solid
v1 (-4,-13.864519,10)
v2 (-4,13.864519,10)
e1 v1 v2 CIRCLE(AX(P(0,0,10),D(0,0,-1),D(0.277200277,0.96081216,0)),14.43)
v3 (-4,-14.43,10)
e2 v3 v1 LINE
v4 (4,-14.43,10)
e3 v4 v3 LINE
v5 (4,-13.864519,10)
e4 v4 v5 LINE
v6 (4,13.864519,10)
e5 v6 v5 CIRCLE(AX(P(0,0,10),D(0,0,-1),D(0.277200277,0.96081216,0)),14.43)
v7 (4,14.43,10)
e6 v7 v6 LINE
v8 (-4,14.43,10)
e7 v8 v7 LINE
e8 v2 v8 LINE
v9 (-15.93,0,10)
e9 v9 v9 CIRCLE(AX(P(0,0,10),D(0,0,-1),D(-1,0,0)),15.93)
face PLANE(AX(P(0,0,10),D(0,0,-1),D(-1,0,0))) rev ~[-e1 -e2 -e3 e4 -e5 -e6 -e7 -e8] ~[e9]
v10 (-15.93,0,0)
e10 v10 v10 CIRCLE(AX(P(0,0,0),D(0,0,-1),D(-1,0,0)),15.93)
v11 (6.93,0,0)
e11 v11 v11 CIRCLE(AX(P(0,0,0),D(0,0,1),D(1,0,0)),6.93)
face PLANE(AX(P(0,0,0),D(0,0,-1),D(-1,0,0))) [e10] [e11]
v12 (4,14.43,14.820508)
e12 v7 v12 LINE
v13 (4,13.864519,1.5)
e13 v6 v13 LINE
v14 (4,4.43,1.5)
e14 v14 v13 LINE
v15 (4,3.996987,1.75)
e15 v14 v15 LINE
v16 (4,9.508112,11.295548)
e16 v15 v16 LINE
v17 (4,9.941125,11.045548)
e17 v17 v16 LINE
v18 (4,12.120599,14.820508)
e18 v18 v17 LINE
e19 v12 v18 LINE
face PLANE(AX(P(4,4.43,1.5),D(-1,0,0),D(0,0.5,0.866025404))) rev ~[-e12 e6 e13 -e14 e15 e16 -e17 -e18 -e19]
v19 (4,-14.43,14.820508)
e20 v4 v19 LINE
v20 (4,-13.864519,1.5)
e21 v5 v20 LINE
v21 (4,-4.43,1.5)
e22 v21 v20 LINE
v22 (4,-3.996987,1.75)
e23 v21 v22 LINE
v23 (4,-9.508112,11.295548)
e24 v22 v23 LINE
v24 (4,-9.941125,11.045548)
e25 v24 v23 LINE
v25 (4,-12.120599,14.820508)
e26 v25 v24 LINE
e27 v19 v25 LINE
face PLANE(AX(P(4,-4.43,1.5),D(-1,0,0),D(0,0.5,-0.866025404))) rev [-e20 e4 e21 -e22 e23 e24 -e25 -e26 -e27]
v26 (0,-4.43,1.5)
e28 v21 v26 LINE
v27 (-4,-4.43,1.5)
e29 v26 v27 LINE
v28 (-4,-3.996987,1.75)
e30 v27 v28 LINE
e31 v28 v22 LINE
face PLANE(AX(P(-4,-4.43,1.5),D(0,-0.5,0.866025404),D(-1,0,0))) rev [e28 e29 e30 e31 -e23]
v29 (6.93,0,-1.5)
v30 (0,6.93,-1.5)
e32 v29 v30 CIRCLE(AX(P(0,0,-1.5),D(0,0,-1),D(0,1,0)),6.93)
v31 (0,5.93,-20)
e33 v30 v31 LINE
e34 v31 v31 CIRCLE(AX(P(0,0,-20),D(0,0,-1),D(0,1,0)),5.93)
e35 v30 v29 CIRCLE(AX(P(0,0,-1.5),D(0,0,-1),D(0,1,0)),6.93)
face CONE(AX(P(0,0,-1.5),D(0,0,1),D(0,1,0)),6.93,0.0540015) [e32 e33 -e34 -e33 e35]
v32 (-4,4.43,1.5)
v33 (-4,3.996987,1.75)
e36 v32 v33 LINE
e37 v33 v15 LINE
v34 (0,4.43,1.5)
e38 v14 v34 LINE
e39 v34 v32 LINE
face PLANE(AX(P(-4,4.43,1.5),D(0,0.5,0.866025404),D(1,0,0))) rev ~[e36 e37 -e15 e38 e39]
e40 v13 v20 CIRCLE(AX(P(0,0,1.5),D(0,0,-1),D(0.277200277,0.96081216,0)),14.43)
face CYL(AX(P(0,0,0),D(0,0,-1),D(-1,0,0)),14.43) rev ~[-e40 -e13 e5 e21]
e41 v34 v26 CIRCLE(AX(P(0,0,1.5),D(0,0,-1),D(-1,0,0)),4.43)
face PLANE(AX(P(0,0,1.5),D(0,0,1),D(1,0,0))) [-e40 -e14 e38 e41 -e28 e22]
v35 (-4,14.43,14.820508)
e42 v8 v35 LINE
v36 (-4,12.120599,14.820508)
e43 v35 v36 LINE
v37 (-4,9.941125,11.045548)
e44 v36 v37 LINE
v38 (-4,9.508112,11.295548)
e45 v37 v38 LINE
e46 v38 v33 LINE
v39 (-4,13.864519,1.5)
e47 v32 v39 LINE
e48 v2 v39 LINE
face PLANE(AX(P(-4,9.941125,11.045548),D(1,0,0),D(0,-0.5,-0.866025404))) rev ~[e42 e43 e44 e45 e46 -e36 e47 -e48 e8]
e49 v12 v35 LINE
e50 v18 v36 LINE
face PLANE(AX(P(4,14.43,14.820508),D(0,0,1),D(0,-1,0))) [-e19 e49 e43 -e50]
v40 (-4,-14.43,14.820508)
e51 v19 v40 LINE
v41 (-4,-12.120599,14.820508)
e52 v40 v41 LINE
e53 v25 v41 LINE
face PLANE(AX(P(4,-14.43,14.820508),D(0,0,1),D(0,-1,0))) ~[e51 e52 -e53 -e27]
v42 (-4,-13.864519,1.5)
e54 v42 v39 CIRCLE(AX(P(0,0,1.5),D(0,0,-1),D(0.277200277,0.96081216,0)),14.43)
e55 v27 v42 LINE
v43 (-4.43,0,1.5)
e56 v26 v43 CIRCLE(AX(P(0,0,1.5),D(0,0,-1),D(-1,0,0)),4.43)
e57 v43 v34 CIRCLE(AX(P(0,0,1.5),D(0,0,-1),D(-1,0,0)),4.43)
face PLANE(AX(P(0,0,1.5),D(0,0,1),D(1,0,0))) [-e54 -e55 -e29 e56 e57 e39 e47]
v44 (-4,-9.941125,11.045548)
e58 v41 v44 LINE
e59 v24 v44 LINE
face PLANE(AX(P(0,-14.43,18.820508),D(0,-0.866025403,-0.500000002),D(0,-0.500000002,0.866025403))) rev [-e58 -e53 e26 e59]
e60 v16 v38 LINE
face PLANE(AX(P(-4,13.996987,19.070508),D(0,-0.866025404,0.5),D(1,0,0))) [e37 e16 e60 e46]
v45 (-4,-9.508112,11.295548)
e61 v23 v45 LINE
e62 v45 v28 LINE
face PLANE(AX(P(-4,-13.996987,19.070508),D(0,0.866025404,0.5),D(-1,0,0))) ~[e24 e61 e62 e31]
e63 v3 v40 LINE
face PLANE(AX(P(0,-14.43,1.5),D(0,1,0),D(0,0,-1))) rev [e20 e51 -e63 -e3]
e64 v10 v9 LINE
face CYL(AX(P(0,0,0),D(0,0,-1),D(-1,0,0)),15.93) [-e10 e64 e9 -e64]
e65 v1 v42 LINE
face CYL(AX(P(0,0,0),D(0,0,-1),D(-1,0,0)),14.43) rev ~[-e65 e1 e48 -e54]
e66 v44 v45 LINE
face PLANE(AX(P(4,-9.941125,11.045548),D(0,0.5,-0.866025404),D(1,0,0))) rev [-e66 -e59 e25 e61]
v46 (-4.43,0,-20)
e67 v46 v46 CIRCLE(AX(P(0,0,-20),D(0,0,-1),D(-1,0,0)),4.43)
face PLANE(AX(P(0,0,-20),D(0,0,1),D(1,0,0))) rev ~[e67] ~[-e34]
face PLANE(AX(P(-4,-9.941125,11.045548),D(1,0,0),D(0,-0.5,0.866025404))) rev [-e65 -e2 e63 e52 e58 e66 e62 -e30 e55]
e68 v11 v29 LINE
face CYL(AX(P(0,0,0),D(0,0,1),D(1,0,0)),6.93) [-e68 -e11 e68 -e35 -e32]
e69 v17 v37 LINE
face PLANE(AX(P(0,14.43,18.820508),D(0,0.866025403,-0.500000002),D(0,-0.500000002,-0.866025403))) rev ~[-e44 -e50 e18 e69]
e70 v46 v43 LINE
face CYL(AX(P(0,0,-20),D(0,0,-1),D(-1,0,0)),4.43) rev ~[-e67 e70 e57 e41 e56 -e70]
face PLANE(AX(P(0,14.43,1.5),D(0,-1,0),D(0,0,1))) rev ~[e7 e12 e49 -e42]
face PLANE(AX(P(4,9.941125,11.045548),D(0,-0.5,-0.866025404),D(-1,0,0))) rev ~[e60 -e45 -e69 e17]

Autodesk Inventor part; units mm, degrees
ref_plane "YZ Plane" through (0, 0, 0) normal (1, 0, 0) x (0, 1, 0)
ref_plane "XZ Plane" through (0, 0, 0) normal (0, 1, 0) x (-1, 0, 0)
ref_plane "XY Plane" through (0, 0, 0) normal (0, 0, 1) x (1, 0, 0)
sketch "Sketch1" plane through (0, 0, 0) normal (0, 0, 1) x (1, 0, 0)
  circle A0 centre (0, 0) radius 6.94 construction
  circle A1 centre (0, 0) radius 6.93
  point P0 (0, 0)
  dimension "d0" = 0.01
sketch "Sketch1 outline for Extrusion1" plane through (0, 0, 0) normal (0, 0, 1) x (1, 0, 0)
  circle A0 centre (0, 0) radius 6.93
extrude "Extrusion1" add sketch "Sketch1 outline for Extrusion1" against normal blind 20
sketch "Sketch2" plane through (0, 0, 0) normal (1, 0, 0) x (0, 1, 0)
  line L0 (-6.93, -20) -> (6.93, -20) construction
  line L1 (-6.93, 0) -> (6.93, 0) construction
  line L2 (6.93, -20) -> (6.93, -1.5)
  line L3 (6.93, -1.5) -> (5.93, -20)
  line L4 (6.93, -20) -> (5.93, -20)
  line L5 (0, 4) -> (0, -24) projected
  point P0 (0, 0)
  dimension "d3" = 1.5
  dimension "d4" = 1
sketch "Sketch2 outline for Revolution1" plane through (0, 0, 0) normal (1, 0, 0) x (0, 1, 0)
  line L0 (5.93, -20) -> (6.93, -20)
  line L1 (6.93, -1.5) -> (5.93, -20)
  line L2 (6.93, -20) -> (6.93, -1.5)
revolve "Revolution1" cut sketch "Sketch2 outline for Revolution1" angle 360 about axis through (0, 0, 0) along (0, 0, -1)
sketch "Sketch3" plane through (0, 0, 0) normal (0, 0, 1) x (1, 0, 0)
  circle A0 centre (0, 0) radius 6.93 construction
  circle A1 centre (0, 0) radius 14.43
  dimension "d6" = 7.5
sketch "Sketch3 outline for Extrusion2" plane through (0, 0, 0) normal (0, 0, 1) x (1, 0, 0)
  circle A0 centre (0, 0) radius 14.43
extrude "Extrusion2" add sketch "Sketch3 outline for Extrusion2" along normal blind 1.5
sketch "Sketch4" plane through (0, 0, -20) normal (0, 0, -1) x (-1, 0, 0)
  circle A0 centre (0, 0) radius 5.93 construction
  circle A1 centre (0, 0) radius 4.43
  dimension "d9" = 1.5
sketch "Sketch4 outline for Extrusion3" plane through (0, 0, -20) normal (0, 0, -1) x (-1, 0, 0)
  circle A0 centre (0, 0) radius 4.43
extrude "Extrusion3" cut sketch "Sketch4 outline for Extrusion3" against normal through all
sketch "Sketch5" plane through (0, 0, 0) normal (1, 0, 0) x (0, 1, 0)
  line L0 (-4.43, 1.5) -> (4.43, 1.5) construction
  line L1 (14.43, 1.5) -> (-14.43, 1.5) construction
  line L2 (4.43, 1.5) -> (14.43, 1.5)
  line L3 (14.43, 1.5) -> (14.43, 18.820508)
  line L4 (14.43, 18.820508) -> (4.43, 1.5)
  point P0 (0, 0)
  dimension "d15" = 60
sketch "Sketch5 outline for Extrusion4" plane through (0, 0, 0) normal (1, 0, 0) x (0, 1, 0)
  line L0 (14.43, 18.820508) -> (4.43, 1.5)
  line L1 (14.43, 1.5) -> (14.43, 18.820508)
  line L2 (4.43, 1.5) -> (14.43, 1.5)
extrude "Extrusion4" add sketch "Sketch5 outline for Extrusion4" along normal mid plane 8
ref_plane "Work Plane1" through (0, 4.43, 1.5) normal (0, 0.5, 0.8660254) x (-1, 0, 0)
sketch "Sketch6" plane through (-4, 14.43, 18.820508) normal (0, -0.8660254, 0.5) x (1, 0, 0)
  line L0 (0, -20) -> (0, 0)
  line L1 (0.50115, -8.72775) -> (7.50139, -8.72775)
  line L2 (8, -20) -> (0, -20)
  line L3 (0, -20) -> (0, -8.97775)
  line L4 (0, -8.97775) -> (8, -8.97775)
  line L5 (8, -8.97775) -> (8, -20)
  point P0 (4, -23.514038)
  dimension "d16" = 0.25
sketch "Sketch6 outline for Extrusion5" plane through (-4, 14.43, 18.820508) normal (0, -0.8660254, 0.5) x (1, 0, 0)
  line L0 (0, -20) -> (8, -20)
  line L1 (0, -8.97775) -> (0, -20)
  line L2 (8, -8.97775) -> (0, -8.97775)
  line L3 (8, -20) -> (8, -8.97775)
extrude "Extrusion5" add sketch "Sketch6 outline for Extrusion5" along normal blind 0.5
sketch "Sketch7" plane through (4, 0, 0) normal (1, 0, 0) x (0, 0, -1)
  line L0 (-1.5, 14.43) -> (-18.820508, 14.43) construction
  line L1 (-18.820508, 14.43) -> (-11.045549, 9.941125) construction
  line L2 (-18.820508, 14.43) -> (-14.820508, 14.43)
  line L3 (-18.820508, 14.43) -> (-14.820508, 12.120599)
  line L4 (-14.820508, 14.43) -> (-14.820508, 12.120599)
  point P0 (0, 0)
  dimension "d19" = 4
sketch "Sketch7 outline for Extrusion6" plane through (4, 0, 0) normal (1, 0, 0) x (0, 0, -1)
  line L0 (-18.820508, 14.43) -> (-14.820508, 14.43)
  line L1 (-14.820508, 14.43) -> (-14.820508, 12.120599)
  line L2 (-14.820508, 12.120599) -> (-18.820508, 14.43)
extrude "Extrusion6" cut sketch "Sketch7 outline for Extrusion6" against normal up to surface (8 mm away)
sketch "Sketch8" plane through (0, 0, 0) normal (0, 0, -1) x (-1, 0, 0)
  circle A0 centre (0, 0) radius 14.43 construction
  circle A1 centre (0, 0) radius 6.93 construction
  circle A2 centre (0, 0) radius 14.43
  circle A3 centre (0, 0) radius 15.93
  dimension "d22" = 0
  dimension "d23" = 1.5
sketch "Sketch8 outline for Extrusion7" plane through (0, 0, 0) normal (0, 0, -1) x (-1, 0, 0)
  circle A0 centre (0, 0) radius 15.93
  circle A1 centre (0, 0) radius 14.43
extrude "Extrusion7" add sketch "Sketch8 outline for Extrusion7" against normal blind 10
mirror "Mirror1" about plane through (0, 0, 0) normal (0, 1, 0) of "Extrusion4", "Extrusion5", "Extrusion6"
properties part number "ECoG_holder_2p1"
